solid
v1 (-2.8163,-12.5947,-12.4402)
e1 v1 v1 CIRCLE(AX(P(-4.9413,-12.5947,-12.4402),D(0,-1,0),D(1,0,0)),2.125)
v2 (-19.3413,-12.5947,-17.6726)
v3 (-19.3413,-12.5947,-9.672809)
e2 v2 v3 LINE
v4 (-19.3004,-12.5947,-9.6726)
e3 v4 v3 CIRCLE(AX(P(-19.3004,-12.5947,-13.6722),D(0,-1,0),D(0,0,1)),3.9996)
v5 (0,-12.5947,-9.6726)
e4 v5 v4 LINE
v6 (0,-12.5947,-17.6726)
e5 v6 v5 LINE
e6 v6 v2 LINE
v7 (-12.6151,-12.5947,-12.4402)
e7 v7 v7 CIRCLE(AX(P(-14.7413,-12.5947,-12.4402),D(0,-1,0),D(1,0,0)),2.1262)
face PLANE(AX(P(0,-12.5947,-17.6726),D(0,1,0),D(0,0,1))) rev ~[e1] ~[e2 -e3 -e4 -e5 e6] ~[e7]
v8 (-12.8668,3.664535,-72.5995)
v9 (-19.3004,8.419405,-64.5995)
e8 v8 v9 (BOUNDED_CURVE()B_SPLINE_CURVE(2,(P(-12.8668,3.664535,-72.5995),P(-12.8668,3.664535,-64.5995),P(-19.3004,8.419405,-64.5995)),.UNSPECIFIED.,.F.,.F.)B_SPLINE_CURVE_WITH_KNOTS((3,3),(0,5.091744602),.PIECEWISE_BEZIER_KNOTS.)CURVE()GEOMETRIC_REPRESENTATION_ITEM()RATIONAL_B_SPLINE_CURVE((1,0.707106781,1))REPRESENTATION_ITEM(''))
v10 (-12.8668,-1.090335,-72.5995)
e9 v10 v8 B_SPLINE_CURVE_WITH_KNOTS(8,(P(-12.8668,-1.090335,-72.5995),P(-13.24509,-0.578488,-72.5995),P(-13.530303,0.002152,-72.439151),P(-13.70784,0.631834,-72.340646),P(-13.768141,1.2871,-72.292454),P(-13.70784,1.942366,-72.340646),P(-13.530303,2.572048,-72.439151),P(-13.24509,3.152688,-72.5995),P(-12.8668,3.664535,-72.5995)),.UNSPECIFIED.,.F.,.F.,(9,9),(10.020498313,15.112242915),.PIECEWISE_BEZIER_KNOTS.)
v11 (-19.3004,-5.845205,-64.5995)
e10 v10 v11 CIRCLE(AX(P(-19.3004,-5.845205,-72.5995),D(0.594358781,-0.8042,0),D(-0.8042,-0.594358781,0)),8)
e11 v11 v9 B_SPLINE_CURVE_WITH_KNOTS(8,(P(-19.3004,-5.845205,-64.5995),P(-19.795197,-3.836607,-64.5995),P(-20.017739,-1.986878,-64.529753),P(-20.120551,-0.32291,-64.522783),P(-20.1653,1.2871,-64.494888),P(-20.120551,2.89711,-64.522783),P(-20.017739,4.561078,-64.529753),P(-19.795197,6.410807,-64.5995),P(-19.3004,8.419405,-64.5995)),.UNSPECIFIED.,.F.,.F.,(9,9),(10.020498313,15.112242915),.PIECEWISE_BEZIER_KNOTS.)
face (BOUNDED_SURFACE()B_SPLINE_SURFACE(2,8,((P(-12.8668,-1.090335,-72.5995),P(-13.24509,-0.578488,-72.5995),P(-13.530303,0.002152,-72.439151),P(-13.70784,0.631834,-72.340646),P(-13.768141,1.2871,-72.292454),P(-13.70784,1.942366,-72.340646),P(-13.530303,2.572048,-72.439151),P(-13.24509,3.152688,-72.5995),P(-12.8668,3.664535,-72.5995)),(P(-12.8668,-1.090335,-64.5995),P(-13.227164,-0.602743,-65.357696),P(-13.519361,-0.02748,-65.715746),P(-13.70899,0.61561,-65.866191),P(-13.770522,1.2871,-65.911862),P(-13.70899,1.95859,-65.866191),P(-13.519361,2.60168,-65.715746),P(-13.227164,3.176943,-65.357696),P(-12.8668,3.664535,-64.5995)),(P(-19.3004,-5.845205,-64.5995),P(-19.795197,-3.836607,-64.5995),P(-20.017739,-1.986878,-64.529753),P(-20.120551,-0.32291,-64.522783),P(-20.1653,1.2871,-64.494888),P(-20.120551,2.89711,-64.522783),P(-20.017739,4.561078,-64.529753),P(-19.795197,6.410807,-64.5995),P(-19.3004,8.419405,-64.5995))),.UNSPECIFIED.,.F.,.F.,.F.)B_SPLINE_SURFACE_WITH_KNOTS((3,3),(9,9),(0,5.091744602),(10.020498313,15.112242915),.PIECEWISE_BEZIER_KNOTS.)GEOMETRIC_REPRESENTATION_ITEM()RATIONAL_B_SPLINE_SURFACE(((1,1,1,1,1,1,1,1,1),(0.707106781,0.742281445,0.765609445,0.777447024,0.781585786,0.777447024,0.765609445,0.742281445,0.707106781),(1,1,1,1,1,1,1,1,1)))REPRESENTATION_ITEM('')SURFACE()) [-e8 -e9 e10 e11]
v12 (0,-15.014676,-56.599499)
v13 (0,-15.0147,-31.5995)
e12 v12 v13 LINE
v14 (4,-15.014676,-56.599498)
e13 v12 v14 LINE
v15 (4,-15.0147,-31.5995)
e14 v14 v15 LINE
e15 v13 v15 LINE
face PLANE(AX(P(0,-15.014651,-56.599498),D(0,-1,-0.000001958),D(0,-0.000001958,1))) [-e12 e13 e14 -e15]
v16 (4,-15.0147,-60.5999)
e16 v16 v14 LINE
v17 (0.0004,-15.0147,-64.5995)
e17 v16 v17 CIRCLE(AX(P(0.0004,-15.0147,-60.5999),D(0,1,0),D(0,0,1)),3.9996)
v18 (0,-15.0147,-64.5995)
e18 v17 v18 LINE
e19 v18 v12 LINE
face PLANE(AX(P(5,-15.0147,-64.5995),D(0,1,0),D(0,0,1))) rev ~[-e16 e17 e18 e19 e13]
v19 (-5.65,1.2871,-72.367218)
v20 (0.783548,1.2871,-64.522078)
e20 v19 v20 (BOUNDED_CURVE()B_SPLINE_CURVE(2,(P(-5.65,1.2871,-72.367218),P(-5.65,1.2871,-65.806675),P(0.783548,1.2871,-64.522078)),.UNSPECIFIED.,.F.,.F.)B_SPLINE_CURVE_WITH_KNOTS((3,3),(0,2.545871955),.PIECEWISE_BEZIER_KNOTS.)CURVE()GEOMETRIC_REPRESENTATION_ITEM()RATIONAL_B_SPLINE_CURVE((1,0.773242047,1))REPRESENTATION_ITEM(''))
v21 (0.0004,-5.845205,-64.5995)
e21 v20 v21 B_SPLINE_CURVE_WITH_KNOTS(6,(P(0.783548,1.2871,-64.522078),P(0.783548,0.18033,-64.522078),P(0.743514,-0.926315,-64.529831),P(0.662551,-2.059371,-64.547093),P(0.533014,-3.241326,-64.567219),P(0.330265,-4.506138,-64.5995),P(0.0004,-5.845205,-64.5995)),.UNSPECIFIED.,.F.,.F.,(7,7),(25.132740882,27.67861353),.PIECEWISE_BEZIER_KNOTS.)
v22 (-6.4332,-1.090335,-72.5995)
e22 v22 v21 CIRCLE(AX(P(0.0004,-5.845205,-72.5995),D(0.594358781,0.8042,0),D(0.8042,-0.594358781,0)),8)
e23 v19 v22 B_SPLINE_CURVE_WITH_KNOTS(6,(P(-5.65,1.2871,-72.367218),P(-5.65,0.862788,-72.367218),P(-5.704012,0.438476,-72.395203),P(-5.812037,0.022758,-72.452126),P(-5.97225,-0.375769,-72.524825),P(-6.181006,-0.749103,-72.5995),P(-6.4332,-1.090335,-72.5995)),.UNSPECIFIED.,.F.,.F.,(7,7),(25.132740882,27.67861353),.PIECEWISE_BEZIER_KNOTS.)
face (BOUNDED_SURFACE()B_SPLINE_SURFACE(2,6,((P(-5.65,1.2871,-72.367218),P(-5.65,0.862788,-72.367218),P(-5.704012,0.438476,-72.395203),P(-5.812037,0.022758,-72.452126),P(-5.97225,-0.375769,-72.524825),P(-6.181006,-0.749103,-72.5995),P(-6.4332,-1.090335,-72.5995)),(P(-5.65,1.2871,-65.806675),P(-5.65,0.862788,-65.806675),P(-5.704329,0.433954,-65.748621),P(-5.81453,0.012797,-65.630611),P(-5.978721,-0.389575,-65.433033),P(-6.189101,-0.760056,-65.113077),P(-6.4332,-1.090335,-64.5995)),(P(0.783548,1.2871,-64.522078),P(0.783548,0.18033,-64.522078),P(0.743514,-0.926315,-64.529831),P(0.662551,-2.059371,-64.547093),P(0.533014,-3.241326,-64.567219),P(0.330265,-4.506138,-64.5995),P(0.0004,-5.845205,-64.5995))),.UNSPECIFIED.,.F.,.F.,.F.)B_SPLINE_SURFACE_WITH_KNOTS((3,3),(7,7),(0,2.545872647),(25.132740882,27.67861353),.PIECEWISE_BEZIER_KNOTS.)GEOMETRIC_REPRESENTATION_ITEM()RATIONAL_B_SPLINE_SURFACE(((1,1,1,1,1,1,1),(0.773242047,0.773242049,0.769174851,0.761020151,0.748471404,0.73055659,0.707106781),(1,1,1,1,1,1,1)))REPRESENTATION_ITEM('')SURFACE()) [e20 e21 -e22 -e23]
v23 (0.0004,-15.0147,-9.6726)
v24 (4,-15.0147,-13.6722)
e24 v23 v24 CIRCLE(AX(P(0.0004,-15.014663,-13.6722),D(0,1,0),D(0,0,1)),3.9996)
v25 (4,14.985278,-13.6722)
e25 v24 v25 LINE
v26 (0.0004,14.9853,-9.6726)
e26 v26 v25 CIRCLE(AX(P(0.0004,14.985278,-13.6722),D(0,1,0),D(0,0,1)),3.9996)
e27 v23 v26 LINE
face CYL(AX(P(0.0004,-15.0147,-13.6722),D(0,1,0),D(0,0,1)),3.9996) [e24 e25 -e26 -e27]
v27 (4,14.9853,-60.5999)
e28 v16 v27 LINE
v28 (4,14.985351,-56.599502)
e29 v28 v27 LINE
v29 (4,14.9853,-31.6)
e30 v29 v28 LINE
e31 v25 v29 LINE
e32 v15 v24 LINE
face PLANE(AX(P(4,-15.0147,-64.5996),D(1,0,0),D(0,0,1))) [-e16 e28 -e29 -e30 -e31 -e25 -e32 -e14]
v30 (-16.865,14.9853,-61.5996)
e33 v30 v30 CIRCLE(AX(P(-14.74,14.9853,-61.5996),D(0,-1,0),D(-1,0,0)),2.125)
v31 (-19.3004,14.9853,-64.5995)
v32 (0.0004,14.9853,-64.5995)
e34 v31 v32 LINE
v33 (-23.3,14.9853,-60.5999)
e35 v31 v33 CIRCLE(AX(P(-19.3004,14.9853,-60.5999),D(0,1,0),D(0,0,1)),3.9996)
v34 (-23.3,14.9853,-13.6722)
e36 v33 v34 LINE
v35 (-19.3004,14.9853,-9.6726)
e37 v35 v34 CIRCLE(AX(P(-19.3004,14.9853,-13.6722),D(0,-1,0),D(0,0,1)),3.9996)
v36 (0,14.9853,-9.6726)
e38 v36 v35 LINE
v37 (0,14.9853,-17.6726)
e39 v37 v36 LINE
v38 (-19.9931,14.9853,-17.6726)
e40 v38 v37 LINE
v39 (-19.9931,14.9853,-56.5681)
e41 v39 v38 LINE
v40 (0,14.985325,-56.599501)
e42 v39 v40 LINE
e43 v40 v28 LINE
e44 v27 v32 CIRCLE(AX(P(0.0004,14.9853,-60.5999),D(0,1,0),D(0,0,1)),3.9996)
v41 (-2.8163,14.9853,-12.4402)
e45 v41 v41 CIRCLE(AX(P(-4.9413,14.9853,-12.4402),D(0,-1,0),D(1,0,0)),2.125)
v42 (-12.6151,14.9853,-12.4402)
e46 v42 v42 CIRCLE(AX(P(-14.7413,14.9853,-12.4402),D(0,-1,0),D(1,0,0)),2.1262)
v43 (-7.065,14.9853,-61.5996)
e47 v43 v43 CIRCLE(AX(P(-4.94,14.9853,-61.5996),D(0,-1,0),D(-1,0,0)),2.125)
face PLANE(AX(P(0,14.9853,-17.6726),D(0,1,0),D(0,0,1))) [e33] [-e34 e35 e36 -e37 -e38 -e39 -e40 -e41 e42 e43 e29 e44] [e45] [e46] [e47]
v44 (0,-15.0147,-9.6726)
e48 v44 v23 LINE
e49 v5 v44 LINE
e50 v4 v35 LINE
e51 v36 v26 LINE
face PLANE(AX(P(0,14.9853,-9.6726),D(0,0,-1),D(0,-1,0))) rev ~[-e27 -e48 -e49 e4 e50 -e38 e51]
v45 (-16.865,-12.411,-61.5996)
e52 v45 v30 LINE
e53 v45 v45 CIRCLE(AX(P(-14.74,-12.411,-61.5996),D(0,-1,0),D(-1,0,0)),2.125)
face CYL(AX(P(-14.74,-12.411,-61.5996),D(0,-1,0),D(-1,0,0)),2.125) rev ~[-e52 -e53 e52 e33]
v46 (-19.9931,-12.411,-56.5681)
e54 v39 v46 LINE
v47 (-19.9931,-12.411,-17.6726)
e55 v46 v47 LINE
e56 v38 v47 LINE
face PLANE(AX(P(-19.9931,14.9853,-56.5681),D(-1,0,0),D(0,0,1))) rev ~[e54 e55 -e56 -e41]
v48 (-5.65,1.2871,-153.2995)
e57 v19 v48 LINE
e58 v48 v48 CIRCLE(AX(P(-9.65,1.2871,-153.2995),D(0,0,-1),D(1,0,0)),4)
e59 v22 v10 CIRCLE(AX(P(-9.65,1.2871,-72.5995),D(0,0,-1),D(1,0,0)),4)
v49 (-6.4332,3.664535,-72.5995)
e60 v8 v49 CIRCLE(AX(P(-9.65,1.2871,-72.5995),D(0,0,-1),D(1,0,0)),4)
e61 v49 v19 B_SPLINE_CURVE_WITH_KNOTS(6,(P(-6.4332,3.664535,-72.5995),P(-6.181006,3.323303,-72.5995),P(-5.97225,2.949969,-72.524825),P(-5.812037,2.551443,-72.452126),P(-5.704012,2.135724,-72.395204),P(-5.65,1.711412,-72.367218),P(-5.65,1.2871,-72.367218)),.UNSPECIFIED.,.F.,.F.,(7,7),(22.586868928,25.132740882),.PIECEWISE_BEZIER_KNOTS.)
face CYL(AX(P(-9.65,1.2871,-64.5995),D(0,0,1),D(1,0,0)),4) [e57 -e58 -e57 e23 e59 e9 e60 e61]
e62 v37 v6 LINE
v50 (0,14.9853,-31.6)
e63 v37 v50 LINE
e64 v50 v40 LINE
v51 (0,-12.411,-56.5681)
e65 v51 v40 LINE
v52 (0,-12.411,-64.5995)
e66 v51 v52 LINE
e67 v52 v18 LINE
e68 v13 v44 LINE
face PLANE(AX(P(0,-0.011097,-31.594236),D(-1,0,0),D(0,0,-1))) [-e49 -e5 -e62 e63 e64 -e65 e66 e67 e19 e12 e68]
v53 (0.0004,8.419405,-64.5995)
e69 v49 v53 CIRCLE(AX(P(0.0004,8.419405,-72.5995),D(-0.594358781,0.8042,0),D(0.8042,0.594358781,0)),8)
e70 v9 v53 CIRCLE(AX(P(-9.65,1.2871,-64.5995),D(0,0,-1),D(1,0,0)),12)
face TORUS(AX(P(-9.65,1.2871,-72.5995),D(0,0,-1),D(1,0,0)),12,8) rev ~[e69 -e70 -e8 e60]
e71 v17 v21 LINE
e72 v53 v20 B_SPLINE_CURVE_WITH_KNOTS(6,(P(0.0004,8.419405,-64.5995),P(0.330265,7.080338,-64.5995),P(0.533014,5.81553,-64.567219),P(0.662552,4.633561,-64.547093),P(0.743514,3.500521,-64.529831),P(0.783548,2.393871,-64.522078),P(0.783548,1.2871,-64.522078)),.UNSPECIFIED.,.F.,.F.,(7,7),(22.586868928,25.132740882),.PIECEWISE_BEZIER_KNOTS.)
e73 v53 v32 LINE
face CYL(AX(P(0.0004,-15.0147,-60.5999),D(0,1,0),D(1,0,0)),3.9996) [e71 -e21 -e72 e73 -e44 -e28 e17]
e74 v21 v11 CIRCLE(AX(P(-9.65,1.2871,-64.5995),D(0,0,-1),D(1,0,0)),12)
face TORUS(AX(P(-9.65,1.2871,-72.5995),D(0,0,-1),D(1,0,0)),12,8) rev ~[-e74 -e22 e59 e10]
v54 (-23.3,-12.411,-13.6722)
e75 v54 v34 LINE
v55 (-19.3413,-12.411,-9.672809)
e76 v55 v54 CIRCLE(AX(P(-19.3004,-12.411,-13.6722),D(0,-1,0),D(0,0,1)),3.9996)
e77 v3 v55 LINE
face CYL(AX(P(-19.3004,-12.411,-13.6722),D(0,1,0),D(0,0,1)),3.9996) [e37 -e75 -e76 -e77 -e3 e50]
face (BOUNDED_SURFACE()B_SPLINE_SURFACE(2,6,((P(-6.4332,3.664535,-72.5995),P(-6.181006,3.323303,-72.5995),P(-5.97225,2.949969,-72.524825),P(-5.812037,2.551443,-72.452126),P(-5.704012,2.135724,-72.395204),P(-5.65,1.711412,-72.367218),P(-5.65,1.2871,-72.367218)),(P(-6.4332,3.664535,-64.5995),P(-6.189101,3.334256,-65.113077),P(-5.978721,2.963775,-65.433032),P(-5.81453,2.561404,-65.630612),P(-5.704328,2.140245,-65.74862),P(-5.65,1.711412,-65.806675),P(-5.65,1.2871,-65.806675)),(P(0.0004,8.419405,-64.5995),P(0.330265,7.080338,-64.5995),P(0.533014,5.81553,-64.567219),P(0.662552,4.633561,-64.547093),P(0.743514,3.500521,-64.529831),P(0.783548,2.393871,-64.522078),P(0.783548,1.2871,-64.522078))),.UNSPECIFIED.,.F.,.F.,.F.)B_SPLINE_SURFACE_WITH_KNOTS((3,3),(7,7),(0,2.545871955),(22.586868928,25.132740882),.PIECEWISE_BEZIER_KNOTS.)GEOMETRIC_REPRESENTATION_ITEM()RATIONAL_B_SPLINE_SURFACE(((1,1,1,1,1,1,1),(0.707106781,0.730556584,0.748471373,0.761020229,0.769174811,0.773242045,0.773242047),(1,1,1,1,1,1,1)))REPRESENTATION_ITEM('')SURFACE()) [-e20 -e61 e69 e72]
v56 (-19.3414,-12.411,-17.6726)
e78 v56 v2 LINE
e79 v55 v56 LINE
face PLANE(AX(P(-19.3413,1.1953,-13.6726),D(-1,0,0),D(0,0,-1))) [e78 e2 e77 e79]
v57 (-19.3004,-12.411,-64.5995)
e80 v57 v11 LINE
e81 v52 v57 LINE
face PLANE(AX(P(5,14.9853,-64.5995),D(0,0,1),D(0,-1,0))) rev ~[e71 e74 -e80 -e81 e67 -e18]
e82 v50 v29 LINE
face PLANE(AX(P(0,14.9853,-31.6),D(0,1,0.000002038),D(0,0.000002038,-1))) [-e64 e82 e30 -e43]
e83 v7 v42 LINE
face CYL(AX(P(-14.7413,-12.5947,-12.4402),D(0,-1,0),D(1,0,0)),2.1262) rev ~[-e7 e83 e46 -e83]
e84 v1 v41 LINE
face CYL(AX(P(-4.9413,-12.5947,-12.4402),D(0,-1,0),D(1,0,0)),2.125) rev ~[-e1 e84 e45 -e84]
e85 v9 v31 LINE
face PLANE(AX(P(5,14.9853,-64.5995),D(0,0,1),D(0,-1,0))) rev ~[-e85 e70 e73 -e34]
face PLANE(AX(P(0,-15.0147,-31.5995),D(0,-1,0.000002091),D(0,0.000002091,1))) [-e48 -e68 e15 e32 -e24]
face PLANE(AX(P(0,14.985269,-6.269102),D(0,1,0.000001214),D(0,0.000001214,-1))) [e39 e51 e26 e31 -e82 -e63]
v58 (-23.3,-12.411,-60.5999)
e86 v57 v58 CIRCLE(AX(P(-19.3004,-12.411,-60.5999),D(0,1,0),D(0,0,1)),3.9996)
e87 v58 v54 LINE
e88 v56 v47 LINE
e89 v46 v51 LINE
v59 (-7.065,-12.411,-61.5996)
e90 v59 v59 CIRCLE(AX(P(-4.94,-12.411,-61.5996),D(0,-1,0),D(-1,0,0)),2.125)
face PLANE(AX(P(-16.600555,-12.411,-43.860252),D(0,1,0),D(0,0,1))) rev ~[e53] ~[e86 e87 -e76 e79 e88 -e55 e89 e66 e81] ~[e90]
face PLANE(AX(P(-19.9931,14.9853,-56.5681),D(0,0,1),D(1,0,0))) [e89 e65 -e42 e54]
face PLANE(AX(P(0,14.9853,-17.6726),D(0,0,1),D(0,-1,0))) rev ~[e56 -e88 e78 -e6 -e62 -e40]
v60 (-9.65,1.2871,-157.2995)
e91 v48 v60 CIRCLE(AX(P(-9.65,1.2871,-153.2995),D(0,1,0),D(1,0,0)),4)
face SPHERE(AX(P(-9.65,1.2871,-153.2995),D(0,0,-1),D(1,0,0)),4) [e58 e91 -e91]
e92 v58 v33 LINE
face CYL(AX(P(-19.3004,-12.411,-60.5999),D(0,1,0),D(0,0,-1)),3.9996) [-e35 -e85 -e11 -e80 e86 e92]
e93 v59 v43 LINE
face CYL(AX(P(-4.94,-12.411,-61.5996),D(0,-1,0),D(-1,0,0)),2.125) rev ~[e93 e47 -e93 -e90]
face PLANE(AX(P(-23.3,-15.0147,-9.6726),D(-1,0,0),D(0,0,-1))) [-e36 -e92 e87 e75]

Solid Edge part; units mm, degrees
sketch "Sketch1" plane through (0, 0, 0) normal (1, 0, 0) x (0, 1, 0)
  circle A0 centre (0, 0) radius 4
  circle A1 centre (0, -63.2) radius 4
  line L0 (-15.0147, -31.5995) -> (-15.0147, -6.5995)
  arc A2 (-15.0147, -6.5995) -> (0, 7.9) centre (-0.023, -7.1) cw
  arc A3 (14.9853, -6.2691) -> (0, 7.9) centre (0.0083, -7.1) ccw
  line L1 (14.9853, -6.2691) -> (14.9853, -31.6)
  line L2 (14.9853, -31.6) -> (14.9853, -56.5995)
  arc A4 (-0.023, -71.0991) -> (14.9853, -56.5995) centre (-0.0063, -56.0991) ccw
  arc A5 (-15.0147, -56.5995) -> (-0.023, -71.0991) centre (-0.023, -56.0991) ccw
  line L3 (-15.0147, -56.5995) -> (-15.0147, -31.5995)
extrude "Protrusion1" add sketch "Sketch1" along normal blind 5
sketch "Sketch2" plane through (0, -0.0147, -31.5996) normal (-1, 0, 0) x (0, 0, -1)
  arc A0 (24.9999, 15) -> (24.9999, -15) centre (24.4909, 0) cw
  line L0 (24.9999, -15) -> (24.9999, -12)
  arc A1 (24.9999, 12) -> (24.9999, -12) centre (24.9999, 0) cw
  line L1 (24.9999, 15) -> (24.9999, 12)
extrude "ProtrusiónExtruida_2" add sketch "Sketch2" along normal blind 38
fillet "Redondeo_1" [suppressed]
sketch "Sketch3" plane through (5, -0.0147, -31.5996) normal (1, 0, 0) x (0, 0, -1)
  line L0 (24.9999, -15) -> (24.9999, 15)
  line L1 (24.9999, 15) -> (42.4193, 14.4186)
  line L2 (42.4193, 14.4186) -> (42.4193, -15)
  line L3 (42.4193, -15) -> (24.9999, -15)
extrude "VaciadoExtruido_1" cut sketch "Sketch3" against normal blind 80.5935
sketch "Sketch4" plane through (5, -0.0147, -24.3497) normal (1, 0, 0) x (0, 1, 0)
  line L0 (-15, 17.7502) -> (15.229, 17.7502)
  line L1 (15.229, 17.7502) -> (15.229, 38.738)
  line L2 (15.229, 38.738) -> (-15, 38.738)
  line L3 (-15, 38.738) -> (-15, 17.7502)
extrude "VaciadoExtruido_2" cut sketch "Sketch4" against normal blind 66.5304
sketch "Sketch5" plane through (0, -0.0147, -31.5995) normal (-1, 0, 0) x (0, -1, 0)
  line L0 (-15, 13.9269) -> (12.58, 13.9269)
  line L1 (12.58, 13.9269) -> (12.58, 21.9269)
  line L2 (12.58, 21.9269) -> (-15, 21.9269)
  line L3 (-15, 13.9269) -> (-15, 21.9269)
extrude "ProtrusiónExtruida_4" add sketch "Sketch5" along normal blind 19.3413
sketch "Sketch6" plane through (-9.6707, -12.5947, -13.6726) normal (0, -1, 0) x (1, 0, 0)
  circle A0 centre (-5.0706, 1.2324) radius 2.1262
  circle A1 centre (4.7294, 1.2324) radius 2.125
extrude "VaciadoExtruido_3" cut sketch "Sketch6" against normal blind 36.3882
sketch "Sketch7" plane through (5, -0.0147, -31.5995) normal (1, 0, 0) x (0, -1, 0)
  line L0 (15, 25) -> (-15, 25)
  line L1 (-15, 25) -> (-15, 33)
  line L2 (-15, 33) -> (15, 33)
  line L3 (15, 33) -> (15, 25)
extrude "Protrusion2" add sketch "Sketch7" against normal up to vertex (5 mm away)
sketch "Sketch8" plane through (-7.1707, 14.9853, -35.5995) normal (0, 1, 0) x (1, 0, 0)
  line L0 (-17.1293, -25.9269) -> (-12.1707, -25.9269)
  line L1 (-17.1293, -25.9269) -> (-17.1293, 29)
  line L2 (12.1707, 29) -> (-17.1293, 29)
  line L3 (12.1707, 20.9686) -> (12.1707, 29)
  line L4 (-12.8224, 20.9686) -> (12.1707, 20.9686)
  line L5 (-12.8224, 20.9686) -> (-12.8224, -17.9269)
  line L6 (-12.1707, -17.9269) -> (-12.8224, -17.9269)
  line L7 (-12.1707, -25.9269) -> (-12.1707, -17.9269)
extrude "ProtrusiónExtruida_6" add sketch "Sketch8" against normal blind 27.3963
sketch "Sketch9" plane through (-12.15, -12.411, -37.1361) normal (0, -1, 0) x (-1, 0, 0)
  circle A0 centre (2.59, 24.4635) radius 2.125
  circle A1 centre (-7.21, 24.4635) radius 2.125
extrude "VaciadoExtruido_4" cut sketch "Sketch9" against normal blind 76.7204
sketch "Sketch10" plane through (0, -0.0147, -35.5995) normal (-1, 0, 0) x (0, 0, -1)
  line L0 (-29, -15) -> (-25.9269, -15)
  line L1 (-25.9269, -15) -> (-25.9269, 15)
  line L2 (-25.9269, 15) -> (-29, 15)
  line L3 (-29, 15) -> (-29, -15)
extrude "VaciadoExtruido_5" cut sketch "Sketch10" against normal blind 44.1991
sketch "Sketch11" plane through (2.5, -15.0147, -37.1361) normal (0, -1, 0) x (0, 0, -1)
  line L0 (-27.4635, 2.5) -> (27.4635, 2.5)
  line L1 (27.4635, 2.5) -> (27.4635, 1.5)
  line L2 (27.4635, 1.5) -> (-27.4635, 1.5)
  line L3 (-27.4635, 1.5) -> (-27.4635, 2.5)
  line L4 (27.4635, -26.8) -> (-27.4635, -26.8)
  line L5 (-27.4635, -26.8) -> (-27.4635, -25.8)
  line L6 (-27.4635, -25.8) -> (27.4635, -25.8)
  line L7 (27.4635, -25.8) -> (27.4635, -26.8)
extrude "VaciadoExtruido_6" cut sketch "Sketch11" against normal blind 65.6283
fillet "Redondeo_2" radius 4 4 edges at (-23.3, 1.2871, -64.5995) (4, -0.0147, -64.5995) (-23.3, 1.2871, -9.6726) (4, -0.0147, -9.6726)
sketch "Sketch12" plane through (-9.65, 1.2871, -64.5995) normal (0, 0, -1) x (1, 0, 0)
  circle A0 centre (0, 0) radius 4
extrude "ProtrusiónExtruida_7" add sketch "Sketch12" along normal blind 92.7
fillet "Redondeo_3" radius 4 1 edges at (-13.65, 1.2871, -157.2995)
fillet "Redondeo_4" radius 8 1 edges at (-13.65, 1.2871, -64.5995)
properties material "Aluminum Alloy:3.0505 , AlMn0.5Mg0.6,  EN-AW 3105"
